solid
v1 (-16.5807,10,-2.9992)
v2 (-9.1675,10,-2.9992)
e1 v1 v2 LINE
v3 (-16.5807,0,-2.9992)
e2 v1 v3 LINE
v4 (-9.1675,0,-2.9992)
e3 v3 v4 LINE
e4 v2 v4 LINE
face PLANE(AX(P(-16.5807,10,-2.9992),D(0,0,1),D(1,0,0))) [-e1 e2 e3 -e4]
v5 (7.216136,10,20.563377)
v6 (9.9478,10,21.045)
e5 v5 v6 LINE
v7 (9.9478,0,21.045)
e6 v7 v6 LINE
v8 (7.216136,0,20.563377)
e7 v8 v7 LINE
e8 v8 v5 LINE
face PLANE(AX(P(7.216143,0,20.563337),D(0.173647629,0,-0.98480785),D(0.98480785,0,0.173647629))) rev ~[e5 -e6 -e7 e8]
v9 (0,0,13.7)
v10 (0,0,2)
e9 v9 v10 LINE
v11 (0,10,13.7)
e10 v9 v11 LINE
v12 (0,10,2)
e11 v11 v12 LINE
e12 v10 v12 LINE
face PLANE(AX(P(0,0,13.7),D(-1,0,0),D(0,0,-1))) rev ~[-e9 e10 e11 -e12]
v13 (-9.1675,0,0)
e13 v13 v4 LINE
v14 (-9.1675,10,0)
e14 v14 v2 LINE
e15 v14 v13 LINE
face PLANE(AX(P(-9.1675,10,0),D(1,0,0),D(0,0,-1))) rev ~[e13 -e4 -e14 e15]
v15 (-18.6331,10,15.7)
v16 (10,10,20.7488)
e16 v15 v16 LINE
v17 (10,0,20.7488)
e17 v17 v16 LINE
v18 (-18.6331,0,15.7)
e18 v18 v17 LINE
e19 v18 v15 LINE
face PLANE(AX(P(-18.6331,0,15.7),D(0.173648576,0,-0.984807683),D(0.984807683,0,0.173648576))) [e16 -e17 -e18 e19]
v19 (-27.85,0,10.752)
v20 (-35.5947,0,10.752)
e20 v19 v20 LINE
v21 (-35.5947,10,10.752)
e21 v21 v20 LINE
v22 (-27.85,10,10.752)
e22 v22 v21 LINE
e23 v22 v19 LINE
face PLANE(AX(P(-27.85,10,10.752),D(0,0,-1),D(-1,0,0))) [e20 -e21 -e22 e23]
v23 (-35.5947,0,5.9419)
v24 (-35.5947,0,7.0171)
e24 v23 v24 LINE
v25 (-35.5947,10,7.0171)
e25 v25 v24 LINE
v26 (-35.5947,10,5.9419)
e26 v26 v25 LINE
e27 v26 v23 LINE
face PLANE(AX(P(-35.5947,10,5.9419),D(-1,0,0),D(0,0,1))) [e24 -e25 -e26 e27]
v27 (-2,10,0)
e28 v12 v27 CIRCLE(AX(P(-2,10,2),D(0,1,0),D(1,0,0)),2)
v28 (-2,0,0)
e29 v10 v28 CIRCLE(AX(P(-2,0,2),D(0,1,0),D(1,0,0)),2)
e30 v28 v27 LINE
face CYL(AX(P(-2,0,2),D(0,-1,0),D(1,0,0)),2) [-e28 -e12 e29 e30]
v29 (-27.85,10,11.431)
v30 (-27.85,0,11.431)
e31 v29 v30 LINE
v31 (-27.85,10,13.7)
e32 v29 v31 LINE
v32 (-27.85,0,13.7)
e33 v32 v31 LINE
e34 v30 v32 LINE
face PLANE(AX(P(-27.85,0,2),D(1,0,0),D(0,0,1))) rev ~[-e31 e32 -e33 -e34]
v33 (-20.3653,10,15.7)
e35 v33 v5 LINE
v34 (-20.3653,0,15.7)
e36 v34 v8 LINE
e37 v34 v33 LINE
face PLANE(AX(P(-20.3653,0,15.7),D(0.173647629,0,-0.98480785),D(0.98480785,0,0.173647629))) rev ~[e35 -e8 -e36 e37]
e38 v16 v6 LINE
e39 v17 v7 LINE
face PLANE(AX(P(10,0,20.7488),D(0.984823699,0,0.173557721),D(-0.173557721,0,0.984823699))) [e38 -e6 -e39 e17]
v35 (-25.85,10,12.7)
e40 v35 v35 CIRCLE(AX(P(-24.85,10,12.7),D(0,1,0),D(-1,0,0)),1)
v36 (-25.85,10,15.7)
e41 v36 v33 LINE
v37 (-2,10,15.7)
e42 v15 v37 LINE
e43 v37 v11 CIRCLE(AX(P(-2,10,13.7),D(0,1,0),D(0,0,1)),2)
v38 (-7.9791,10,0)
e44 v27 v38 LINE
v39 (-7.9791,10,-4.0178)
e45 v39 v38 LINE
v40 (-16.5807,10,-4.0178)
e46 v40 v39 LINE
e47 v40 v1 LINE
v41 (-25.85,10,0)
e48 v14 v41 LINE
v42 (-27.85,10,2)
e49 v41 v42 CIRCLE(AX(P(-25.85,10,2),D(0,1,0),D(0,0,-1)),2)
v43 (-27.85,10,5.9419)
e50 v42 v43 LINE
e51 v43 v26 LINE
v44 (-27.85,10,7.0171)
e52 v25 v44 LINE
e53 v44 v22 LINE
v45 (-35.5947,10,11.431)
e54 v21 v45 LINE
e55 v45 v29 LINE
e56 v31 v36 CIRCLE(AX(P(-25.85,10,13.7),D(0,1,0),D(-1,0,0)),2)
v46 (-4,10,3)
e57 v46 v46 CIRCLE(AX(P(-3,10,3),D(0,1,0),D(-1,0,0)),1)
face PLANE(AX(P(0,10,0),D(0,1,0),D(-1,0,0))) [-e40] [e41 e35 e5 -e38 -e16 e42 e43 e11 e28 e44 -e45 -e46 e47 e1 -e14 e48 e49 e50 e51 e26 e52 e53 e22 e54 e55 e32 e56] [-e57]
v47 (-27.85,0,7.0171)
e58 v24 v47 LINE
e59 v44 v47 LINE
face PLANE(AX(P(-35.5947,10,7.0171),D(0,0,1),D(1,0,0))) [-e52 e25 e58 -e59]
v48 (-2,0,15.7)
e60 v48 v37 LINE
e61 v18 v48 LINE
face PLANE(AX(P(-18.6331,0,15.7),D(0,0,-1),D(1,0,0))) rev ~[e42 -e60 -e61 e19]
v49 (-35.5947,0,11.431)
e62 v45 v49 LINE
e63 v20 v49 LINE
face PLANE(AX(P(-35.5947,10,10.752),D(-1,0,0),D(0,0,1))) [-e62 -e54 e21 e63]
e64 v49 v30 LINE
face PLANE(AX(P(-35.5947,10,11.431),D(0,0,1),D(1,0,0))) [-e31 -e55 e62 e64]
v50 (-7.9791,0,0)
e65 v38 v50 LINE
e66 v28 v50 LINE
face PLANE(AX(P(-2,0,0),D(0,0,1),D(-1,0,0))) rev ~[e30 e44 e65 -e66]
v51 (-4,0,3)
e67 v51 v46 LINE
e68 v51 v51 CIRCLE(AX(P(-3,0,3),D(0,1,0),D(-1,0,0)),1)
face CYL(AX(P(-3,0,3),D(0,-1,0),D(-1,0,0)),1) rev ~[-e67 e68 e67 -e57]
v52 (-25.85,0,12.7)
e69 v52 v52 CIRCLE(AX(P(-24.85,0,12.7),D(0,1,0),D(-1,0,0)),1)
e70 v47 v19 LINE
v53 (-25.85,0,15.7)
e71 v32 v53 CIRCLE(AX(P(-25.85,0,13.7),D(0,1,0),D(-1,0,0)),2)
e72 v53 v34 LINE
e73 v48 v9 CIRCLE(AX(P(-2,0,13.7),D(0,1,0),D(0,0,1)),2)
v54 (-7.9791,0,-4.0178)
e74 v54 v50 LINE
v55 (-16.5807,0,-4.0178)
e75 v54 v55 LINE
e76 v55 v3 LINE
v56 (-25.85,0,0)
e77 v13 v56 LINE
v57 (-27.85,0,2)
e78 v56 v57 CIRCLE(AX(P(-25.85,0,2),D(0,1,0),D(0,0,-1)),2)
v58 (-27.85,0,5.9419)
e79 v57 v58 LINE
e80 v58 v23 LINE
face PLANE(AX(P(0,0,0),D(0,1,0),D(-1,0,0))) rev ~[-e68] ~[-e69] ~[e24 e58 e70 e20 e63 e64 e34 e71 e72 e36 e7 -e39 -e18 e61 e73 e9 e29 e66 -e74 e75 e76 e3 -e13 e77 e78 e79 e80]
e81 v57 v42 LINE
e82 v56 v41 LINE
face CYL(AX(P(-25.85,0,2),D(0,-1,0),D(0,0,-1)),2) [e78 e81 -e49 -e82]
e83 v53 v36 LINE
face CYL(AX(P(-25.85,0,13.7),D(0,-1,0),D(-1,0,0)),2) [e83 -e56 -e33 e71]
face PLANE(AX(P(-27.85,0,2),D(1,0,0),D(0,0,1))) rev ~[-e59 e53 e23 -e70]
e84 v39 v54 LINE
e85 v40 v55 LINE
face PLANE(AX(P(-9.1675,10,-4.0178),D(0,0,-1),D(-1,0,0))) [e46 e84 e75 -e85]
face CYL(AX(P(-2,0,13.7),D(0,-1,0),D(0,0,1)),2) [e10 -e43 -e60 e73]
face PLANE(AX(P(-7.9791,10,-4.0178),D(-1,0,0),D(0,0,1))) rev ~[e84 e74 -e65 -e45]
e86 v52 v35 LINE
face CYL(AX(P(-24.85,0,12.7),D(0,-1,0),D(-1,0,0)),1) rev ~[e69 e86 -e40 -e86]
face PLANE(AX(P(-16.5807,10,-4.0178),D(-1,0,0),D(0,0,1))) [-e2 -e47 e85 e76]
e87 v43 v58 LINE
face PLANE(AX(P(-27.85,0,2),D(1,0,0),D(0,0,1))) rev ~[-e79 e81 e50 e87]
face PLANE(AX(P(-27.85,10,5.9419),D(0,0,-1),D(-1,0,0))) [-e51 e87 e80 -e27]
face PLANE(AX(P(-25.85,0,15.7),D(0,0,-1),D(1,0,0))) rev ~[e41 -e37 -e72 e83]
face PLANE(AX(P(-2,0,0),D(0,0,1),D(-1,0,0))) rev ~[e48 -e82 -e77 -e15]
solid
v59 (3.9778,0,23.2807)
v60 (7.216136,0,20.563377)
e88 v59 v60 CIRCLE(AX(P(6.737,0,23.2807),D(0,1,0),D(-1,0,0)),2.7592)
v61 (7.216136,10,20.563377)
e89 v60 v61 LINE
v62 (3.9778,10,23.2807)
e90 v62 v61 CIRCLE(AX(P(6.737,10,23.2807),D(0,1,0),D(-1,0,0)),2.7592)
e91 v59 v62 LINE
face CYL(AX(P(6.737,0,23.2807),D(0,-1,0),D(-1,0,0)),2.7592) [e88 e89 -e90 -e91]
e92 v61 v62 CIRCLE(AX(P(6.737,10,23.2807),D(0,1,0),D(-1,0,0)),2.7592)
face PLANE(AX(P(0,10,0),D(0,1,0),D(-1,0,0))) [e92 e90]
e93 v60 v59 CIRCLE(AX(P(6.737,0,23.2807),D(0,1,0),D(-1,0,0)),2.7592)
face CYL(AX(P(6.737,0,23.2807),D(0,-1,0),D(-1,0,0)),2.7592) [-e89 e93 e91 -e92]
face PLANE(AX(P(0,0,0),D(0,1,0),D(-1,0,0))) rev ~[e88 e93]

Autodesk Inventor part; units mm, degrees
ref_plane "YZ Plane" through (0, 0, 0) normal (1, 0, 0) x (0, 1, 0)
ref_plane "XZ Plane" through (0, 0, 0) normal (0, 1, 0) x (-1, 0, 0)
ref_plane "XY Plane" through (0, 0, 0) normal (0, 0, 1) x (1, 0, 0)
sketch "Sketch1" plane through (0, 0, 0) normal (0, 1, 0) x (-1, 0, 0)
  line L0 (2, 0) -> (25.85, 0)
  line L1 (27.85, 2) -> (27.85, 13.7)
  line L2 (25.85, 15.7) -> (2, 15.7)
  line L3 (0, 13.7) -> (0, 2)
  arc A0 (27.85, 13.7) -> (25.85, 15.7) centre (25.85, 13.7) ccw
  arc A1 (25.85, 0) -> (27.85, 2) centre (25.85, 2) ccw
  arc A2 (0, 2) -> (2, 0) centre (2, 2) ccw
  arc A3 (2, 15.7) -> (0, 13.7) centre (2, 13.7) ccw
  line L4 (20.3653, 15.7) -> (-9.9478, 21.045)
  line L5 (18.6331, 15.7) -> (-10, 20.7488)
  line L6 (-10, 20.7488) -> (-9.9478, 21.045)
  circle A4 centre (-6.737, 23.2807) radius 2.7592
  circle A5 centre (24.85, 12.7) radius 1
  circle A6 centre (3, 3) radius 1
  point P0 (0, 0)
  point P1 (27.85, 15.7)
  point P2 (27.85, 0)
  point P3 (0, 15.7)
  dimension "d0" = 27.85
  dimension "d1" = 15.7
  dimension "d2" = 2
  dimension "d5" = 170
  dimension "d6" = 10
  dimension "d7" = 2
  dimension "d8" = 2
  dimension "d9" = 3
  dimension "d10" = 3
  dimension "d11" = 3
  dimension "d12" = 3
extrude "Extrusion1" add sketch "Sketch1" along normal blind 10
sketch "Sketch2" plane through (0, 10, 0) normal (0, 1, 0) x (1, 0, 0)
  line L0 (-27.85, -2) -> (-27.85, -13.7) projected
  line L1 (-35.5947, -11.431) -> (-27.85, -11.431)
  line L2 (-27.85, -11.431) -> (-27.85, -10.752)
  line L3 (-27.85, -10.752) -> (-35.5947, -10.752)
  line L4 (-35.5947, -10.752) -> (-35.5947, -11.431)
  line L5 (-35.5947, -7.0171) -> (-27.85, -7.0171)
  line L6 (-27.85, -7.0171) -> (-27.85, -5.9419)
  line L7 (-27.85, -5.9419) -> (-35.5947, -5.9419)
  line L8 (-35.5947, -5.9419) -> (-35.5947, -7.0171)
  line L9 (-16.5807, 2.9992) -> (-9.1675, 2.9992)
  line L10 (-9.1675, 2.9992) -> (-9.1675, 4.0178)
  line L11 (-9.1675, 4.0178) -> (-16.5807, 4.0178)
  line L12 (-16.5807, 4.0178) -> (-16.5807, 2.9992)
  line L13 (-9.1675, 4.0178) -> (-7.9791, 4.0178)
  line L14 (-7.9791, 4.0178) -> (-7.9791, 0)
  line L15 (-7.9791, 0) -> (-9.1675, 0)
  line L16 (-9.1675, 0) -> (-9.1675, 4.0178)
  point P0 (0, 0)
extrude "Extrusion2" add sketch "Sketch2" against normal up to surface (10 mm away)
properties part number "00_Endstop"
